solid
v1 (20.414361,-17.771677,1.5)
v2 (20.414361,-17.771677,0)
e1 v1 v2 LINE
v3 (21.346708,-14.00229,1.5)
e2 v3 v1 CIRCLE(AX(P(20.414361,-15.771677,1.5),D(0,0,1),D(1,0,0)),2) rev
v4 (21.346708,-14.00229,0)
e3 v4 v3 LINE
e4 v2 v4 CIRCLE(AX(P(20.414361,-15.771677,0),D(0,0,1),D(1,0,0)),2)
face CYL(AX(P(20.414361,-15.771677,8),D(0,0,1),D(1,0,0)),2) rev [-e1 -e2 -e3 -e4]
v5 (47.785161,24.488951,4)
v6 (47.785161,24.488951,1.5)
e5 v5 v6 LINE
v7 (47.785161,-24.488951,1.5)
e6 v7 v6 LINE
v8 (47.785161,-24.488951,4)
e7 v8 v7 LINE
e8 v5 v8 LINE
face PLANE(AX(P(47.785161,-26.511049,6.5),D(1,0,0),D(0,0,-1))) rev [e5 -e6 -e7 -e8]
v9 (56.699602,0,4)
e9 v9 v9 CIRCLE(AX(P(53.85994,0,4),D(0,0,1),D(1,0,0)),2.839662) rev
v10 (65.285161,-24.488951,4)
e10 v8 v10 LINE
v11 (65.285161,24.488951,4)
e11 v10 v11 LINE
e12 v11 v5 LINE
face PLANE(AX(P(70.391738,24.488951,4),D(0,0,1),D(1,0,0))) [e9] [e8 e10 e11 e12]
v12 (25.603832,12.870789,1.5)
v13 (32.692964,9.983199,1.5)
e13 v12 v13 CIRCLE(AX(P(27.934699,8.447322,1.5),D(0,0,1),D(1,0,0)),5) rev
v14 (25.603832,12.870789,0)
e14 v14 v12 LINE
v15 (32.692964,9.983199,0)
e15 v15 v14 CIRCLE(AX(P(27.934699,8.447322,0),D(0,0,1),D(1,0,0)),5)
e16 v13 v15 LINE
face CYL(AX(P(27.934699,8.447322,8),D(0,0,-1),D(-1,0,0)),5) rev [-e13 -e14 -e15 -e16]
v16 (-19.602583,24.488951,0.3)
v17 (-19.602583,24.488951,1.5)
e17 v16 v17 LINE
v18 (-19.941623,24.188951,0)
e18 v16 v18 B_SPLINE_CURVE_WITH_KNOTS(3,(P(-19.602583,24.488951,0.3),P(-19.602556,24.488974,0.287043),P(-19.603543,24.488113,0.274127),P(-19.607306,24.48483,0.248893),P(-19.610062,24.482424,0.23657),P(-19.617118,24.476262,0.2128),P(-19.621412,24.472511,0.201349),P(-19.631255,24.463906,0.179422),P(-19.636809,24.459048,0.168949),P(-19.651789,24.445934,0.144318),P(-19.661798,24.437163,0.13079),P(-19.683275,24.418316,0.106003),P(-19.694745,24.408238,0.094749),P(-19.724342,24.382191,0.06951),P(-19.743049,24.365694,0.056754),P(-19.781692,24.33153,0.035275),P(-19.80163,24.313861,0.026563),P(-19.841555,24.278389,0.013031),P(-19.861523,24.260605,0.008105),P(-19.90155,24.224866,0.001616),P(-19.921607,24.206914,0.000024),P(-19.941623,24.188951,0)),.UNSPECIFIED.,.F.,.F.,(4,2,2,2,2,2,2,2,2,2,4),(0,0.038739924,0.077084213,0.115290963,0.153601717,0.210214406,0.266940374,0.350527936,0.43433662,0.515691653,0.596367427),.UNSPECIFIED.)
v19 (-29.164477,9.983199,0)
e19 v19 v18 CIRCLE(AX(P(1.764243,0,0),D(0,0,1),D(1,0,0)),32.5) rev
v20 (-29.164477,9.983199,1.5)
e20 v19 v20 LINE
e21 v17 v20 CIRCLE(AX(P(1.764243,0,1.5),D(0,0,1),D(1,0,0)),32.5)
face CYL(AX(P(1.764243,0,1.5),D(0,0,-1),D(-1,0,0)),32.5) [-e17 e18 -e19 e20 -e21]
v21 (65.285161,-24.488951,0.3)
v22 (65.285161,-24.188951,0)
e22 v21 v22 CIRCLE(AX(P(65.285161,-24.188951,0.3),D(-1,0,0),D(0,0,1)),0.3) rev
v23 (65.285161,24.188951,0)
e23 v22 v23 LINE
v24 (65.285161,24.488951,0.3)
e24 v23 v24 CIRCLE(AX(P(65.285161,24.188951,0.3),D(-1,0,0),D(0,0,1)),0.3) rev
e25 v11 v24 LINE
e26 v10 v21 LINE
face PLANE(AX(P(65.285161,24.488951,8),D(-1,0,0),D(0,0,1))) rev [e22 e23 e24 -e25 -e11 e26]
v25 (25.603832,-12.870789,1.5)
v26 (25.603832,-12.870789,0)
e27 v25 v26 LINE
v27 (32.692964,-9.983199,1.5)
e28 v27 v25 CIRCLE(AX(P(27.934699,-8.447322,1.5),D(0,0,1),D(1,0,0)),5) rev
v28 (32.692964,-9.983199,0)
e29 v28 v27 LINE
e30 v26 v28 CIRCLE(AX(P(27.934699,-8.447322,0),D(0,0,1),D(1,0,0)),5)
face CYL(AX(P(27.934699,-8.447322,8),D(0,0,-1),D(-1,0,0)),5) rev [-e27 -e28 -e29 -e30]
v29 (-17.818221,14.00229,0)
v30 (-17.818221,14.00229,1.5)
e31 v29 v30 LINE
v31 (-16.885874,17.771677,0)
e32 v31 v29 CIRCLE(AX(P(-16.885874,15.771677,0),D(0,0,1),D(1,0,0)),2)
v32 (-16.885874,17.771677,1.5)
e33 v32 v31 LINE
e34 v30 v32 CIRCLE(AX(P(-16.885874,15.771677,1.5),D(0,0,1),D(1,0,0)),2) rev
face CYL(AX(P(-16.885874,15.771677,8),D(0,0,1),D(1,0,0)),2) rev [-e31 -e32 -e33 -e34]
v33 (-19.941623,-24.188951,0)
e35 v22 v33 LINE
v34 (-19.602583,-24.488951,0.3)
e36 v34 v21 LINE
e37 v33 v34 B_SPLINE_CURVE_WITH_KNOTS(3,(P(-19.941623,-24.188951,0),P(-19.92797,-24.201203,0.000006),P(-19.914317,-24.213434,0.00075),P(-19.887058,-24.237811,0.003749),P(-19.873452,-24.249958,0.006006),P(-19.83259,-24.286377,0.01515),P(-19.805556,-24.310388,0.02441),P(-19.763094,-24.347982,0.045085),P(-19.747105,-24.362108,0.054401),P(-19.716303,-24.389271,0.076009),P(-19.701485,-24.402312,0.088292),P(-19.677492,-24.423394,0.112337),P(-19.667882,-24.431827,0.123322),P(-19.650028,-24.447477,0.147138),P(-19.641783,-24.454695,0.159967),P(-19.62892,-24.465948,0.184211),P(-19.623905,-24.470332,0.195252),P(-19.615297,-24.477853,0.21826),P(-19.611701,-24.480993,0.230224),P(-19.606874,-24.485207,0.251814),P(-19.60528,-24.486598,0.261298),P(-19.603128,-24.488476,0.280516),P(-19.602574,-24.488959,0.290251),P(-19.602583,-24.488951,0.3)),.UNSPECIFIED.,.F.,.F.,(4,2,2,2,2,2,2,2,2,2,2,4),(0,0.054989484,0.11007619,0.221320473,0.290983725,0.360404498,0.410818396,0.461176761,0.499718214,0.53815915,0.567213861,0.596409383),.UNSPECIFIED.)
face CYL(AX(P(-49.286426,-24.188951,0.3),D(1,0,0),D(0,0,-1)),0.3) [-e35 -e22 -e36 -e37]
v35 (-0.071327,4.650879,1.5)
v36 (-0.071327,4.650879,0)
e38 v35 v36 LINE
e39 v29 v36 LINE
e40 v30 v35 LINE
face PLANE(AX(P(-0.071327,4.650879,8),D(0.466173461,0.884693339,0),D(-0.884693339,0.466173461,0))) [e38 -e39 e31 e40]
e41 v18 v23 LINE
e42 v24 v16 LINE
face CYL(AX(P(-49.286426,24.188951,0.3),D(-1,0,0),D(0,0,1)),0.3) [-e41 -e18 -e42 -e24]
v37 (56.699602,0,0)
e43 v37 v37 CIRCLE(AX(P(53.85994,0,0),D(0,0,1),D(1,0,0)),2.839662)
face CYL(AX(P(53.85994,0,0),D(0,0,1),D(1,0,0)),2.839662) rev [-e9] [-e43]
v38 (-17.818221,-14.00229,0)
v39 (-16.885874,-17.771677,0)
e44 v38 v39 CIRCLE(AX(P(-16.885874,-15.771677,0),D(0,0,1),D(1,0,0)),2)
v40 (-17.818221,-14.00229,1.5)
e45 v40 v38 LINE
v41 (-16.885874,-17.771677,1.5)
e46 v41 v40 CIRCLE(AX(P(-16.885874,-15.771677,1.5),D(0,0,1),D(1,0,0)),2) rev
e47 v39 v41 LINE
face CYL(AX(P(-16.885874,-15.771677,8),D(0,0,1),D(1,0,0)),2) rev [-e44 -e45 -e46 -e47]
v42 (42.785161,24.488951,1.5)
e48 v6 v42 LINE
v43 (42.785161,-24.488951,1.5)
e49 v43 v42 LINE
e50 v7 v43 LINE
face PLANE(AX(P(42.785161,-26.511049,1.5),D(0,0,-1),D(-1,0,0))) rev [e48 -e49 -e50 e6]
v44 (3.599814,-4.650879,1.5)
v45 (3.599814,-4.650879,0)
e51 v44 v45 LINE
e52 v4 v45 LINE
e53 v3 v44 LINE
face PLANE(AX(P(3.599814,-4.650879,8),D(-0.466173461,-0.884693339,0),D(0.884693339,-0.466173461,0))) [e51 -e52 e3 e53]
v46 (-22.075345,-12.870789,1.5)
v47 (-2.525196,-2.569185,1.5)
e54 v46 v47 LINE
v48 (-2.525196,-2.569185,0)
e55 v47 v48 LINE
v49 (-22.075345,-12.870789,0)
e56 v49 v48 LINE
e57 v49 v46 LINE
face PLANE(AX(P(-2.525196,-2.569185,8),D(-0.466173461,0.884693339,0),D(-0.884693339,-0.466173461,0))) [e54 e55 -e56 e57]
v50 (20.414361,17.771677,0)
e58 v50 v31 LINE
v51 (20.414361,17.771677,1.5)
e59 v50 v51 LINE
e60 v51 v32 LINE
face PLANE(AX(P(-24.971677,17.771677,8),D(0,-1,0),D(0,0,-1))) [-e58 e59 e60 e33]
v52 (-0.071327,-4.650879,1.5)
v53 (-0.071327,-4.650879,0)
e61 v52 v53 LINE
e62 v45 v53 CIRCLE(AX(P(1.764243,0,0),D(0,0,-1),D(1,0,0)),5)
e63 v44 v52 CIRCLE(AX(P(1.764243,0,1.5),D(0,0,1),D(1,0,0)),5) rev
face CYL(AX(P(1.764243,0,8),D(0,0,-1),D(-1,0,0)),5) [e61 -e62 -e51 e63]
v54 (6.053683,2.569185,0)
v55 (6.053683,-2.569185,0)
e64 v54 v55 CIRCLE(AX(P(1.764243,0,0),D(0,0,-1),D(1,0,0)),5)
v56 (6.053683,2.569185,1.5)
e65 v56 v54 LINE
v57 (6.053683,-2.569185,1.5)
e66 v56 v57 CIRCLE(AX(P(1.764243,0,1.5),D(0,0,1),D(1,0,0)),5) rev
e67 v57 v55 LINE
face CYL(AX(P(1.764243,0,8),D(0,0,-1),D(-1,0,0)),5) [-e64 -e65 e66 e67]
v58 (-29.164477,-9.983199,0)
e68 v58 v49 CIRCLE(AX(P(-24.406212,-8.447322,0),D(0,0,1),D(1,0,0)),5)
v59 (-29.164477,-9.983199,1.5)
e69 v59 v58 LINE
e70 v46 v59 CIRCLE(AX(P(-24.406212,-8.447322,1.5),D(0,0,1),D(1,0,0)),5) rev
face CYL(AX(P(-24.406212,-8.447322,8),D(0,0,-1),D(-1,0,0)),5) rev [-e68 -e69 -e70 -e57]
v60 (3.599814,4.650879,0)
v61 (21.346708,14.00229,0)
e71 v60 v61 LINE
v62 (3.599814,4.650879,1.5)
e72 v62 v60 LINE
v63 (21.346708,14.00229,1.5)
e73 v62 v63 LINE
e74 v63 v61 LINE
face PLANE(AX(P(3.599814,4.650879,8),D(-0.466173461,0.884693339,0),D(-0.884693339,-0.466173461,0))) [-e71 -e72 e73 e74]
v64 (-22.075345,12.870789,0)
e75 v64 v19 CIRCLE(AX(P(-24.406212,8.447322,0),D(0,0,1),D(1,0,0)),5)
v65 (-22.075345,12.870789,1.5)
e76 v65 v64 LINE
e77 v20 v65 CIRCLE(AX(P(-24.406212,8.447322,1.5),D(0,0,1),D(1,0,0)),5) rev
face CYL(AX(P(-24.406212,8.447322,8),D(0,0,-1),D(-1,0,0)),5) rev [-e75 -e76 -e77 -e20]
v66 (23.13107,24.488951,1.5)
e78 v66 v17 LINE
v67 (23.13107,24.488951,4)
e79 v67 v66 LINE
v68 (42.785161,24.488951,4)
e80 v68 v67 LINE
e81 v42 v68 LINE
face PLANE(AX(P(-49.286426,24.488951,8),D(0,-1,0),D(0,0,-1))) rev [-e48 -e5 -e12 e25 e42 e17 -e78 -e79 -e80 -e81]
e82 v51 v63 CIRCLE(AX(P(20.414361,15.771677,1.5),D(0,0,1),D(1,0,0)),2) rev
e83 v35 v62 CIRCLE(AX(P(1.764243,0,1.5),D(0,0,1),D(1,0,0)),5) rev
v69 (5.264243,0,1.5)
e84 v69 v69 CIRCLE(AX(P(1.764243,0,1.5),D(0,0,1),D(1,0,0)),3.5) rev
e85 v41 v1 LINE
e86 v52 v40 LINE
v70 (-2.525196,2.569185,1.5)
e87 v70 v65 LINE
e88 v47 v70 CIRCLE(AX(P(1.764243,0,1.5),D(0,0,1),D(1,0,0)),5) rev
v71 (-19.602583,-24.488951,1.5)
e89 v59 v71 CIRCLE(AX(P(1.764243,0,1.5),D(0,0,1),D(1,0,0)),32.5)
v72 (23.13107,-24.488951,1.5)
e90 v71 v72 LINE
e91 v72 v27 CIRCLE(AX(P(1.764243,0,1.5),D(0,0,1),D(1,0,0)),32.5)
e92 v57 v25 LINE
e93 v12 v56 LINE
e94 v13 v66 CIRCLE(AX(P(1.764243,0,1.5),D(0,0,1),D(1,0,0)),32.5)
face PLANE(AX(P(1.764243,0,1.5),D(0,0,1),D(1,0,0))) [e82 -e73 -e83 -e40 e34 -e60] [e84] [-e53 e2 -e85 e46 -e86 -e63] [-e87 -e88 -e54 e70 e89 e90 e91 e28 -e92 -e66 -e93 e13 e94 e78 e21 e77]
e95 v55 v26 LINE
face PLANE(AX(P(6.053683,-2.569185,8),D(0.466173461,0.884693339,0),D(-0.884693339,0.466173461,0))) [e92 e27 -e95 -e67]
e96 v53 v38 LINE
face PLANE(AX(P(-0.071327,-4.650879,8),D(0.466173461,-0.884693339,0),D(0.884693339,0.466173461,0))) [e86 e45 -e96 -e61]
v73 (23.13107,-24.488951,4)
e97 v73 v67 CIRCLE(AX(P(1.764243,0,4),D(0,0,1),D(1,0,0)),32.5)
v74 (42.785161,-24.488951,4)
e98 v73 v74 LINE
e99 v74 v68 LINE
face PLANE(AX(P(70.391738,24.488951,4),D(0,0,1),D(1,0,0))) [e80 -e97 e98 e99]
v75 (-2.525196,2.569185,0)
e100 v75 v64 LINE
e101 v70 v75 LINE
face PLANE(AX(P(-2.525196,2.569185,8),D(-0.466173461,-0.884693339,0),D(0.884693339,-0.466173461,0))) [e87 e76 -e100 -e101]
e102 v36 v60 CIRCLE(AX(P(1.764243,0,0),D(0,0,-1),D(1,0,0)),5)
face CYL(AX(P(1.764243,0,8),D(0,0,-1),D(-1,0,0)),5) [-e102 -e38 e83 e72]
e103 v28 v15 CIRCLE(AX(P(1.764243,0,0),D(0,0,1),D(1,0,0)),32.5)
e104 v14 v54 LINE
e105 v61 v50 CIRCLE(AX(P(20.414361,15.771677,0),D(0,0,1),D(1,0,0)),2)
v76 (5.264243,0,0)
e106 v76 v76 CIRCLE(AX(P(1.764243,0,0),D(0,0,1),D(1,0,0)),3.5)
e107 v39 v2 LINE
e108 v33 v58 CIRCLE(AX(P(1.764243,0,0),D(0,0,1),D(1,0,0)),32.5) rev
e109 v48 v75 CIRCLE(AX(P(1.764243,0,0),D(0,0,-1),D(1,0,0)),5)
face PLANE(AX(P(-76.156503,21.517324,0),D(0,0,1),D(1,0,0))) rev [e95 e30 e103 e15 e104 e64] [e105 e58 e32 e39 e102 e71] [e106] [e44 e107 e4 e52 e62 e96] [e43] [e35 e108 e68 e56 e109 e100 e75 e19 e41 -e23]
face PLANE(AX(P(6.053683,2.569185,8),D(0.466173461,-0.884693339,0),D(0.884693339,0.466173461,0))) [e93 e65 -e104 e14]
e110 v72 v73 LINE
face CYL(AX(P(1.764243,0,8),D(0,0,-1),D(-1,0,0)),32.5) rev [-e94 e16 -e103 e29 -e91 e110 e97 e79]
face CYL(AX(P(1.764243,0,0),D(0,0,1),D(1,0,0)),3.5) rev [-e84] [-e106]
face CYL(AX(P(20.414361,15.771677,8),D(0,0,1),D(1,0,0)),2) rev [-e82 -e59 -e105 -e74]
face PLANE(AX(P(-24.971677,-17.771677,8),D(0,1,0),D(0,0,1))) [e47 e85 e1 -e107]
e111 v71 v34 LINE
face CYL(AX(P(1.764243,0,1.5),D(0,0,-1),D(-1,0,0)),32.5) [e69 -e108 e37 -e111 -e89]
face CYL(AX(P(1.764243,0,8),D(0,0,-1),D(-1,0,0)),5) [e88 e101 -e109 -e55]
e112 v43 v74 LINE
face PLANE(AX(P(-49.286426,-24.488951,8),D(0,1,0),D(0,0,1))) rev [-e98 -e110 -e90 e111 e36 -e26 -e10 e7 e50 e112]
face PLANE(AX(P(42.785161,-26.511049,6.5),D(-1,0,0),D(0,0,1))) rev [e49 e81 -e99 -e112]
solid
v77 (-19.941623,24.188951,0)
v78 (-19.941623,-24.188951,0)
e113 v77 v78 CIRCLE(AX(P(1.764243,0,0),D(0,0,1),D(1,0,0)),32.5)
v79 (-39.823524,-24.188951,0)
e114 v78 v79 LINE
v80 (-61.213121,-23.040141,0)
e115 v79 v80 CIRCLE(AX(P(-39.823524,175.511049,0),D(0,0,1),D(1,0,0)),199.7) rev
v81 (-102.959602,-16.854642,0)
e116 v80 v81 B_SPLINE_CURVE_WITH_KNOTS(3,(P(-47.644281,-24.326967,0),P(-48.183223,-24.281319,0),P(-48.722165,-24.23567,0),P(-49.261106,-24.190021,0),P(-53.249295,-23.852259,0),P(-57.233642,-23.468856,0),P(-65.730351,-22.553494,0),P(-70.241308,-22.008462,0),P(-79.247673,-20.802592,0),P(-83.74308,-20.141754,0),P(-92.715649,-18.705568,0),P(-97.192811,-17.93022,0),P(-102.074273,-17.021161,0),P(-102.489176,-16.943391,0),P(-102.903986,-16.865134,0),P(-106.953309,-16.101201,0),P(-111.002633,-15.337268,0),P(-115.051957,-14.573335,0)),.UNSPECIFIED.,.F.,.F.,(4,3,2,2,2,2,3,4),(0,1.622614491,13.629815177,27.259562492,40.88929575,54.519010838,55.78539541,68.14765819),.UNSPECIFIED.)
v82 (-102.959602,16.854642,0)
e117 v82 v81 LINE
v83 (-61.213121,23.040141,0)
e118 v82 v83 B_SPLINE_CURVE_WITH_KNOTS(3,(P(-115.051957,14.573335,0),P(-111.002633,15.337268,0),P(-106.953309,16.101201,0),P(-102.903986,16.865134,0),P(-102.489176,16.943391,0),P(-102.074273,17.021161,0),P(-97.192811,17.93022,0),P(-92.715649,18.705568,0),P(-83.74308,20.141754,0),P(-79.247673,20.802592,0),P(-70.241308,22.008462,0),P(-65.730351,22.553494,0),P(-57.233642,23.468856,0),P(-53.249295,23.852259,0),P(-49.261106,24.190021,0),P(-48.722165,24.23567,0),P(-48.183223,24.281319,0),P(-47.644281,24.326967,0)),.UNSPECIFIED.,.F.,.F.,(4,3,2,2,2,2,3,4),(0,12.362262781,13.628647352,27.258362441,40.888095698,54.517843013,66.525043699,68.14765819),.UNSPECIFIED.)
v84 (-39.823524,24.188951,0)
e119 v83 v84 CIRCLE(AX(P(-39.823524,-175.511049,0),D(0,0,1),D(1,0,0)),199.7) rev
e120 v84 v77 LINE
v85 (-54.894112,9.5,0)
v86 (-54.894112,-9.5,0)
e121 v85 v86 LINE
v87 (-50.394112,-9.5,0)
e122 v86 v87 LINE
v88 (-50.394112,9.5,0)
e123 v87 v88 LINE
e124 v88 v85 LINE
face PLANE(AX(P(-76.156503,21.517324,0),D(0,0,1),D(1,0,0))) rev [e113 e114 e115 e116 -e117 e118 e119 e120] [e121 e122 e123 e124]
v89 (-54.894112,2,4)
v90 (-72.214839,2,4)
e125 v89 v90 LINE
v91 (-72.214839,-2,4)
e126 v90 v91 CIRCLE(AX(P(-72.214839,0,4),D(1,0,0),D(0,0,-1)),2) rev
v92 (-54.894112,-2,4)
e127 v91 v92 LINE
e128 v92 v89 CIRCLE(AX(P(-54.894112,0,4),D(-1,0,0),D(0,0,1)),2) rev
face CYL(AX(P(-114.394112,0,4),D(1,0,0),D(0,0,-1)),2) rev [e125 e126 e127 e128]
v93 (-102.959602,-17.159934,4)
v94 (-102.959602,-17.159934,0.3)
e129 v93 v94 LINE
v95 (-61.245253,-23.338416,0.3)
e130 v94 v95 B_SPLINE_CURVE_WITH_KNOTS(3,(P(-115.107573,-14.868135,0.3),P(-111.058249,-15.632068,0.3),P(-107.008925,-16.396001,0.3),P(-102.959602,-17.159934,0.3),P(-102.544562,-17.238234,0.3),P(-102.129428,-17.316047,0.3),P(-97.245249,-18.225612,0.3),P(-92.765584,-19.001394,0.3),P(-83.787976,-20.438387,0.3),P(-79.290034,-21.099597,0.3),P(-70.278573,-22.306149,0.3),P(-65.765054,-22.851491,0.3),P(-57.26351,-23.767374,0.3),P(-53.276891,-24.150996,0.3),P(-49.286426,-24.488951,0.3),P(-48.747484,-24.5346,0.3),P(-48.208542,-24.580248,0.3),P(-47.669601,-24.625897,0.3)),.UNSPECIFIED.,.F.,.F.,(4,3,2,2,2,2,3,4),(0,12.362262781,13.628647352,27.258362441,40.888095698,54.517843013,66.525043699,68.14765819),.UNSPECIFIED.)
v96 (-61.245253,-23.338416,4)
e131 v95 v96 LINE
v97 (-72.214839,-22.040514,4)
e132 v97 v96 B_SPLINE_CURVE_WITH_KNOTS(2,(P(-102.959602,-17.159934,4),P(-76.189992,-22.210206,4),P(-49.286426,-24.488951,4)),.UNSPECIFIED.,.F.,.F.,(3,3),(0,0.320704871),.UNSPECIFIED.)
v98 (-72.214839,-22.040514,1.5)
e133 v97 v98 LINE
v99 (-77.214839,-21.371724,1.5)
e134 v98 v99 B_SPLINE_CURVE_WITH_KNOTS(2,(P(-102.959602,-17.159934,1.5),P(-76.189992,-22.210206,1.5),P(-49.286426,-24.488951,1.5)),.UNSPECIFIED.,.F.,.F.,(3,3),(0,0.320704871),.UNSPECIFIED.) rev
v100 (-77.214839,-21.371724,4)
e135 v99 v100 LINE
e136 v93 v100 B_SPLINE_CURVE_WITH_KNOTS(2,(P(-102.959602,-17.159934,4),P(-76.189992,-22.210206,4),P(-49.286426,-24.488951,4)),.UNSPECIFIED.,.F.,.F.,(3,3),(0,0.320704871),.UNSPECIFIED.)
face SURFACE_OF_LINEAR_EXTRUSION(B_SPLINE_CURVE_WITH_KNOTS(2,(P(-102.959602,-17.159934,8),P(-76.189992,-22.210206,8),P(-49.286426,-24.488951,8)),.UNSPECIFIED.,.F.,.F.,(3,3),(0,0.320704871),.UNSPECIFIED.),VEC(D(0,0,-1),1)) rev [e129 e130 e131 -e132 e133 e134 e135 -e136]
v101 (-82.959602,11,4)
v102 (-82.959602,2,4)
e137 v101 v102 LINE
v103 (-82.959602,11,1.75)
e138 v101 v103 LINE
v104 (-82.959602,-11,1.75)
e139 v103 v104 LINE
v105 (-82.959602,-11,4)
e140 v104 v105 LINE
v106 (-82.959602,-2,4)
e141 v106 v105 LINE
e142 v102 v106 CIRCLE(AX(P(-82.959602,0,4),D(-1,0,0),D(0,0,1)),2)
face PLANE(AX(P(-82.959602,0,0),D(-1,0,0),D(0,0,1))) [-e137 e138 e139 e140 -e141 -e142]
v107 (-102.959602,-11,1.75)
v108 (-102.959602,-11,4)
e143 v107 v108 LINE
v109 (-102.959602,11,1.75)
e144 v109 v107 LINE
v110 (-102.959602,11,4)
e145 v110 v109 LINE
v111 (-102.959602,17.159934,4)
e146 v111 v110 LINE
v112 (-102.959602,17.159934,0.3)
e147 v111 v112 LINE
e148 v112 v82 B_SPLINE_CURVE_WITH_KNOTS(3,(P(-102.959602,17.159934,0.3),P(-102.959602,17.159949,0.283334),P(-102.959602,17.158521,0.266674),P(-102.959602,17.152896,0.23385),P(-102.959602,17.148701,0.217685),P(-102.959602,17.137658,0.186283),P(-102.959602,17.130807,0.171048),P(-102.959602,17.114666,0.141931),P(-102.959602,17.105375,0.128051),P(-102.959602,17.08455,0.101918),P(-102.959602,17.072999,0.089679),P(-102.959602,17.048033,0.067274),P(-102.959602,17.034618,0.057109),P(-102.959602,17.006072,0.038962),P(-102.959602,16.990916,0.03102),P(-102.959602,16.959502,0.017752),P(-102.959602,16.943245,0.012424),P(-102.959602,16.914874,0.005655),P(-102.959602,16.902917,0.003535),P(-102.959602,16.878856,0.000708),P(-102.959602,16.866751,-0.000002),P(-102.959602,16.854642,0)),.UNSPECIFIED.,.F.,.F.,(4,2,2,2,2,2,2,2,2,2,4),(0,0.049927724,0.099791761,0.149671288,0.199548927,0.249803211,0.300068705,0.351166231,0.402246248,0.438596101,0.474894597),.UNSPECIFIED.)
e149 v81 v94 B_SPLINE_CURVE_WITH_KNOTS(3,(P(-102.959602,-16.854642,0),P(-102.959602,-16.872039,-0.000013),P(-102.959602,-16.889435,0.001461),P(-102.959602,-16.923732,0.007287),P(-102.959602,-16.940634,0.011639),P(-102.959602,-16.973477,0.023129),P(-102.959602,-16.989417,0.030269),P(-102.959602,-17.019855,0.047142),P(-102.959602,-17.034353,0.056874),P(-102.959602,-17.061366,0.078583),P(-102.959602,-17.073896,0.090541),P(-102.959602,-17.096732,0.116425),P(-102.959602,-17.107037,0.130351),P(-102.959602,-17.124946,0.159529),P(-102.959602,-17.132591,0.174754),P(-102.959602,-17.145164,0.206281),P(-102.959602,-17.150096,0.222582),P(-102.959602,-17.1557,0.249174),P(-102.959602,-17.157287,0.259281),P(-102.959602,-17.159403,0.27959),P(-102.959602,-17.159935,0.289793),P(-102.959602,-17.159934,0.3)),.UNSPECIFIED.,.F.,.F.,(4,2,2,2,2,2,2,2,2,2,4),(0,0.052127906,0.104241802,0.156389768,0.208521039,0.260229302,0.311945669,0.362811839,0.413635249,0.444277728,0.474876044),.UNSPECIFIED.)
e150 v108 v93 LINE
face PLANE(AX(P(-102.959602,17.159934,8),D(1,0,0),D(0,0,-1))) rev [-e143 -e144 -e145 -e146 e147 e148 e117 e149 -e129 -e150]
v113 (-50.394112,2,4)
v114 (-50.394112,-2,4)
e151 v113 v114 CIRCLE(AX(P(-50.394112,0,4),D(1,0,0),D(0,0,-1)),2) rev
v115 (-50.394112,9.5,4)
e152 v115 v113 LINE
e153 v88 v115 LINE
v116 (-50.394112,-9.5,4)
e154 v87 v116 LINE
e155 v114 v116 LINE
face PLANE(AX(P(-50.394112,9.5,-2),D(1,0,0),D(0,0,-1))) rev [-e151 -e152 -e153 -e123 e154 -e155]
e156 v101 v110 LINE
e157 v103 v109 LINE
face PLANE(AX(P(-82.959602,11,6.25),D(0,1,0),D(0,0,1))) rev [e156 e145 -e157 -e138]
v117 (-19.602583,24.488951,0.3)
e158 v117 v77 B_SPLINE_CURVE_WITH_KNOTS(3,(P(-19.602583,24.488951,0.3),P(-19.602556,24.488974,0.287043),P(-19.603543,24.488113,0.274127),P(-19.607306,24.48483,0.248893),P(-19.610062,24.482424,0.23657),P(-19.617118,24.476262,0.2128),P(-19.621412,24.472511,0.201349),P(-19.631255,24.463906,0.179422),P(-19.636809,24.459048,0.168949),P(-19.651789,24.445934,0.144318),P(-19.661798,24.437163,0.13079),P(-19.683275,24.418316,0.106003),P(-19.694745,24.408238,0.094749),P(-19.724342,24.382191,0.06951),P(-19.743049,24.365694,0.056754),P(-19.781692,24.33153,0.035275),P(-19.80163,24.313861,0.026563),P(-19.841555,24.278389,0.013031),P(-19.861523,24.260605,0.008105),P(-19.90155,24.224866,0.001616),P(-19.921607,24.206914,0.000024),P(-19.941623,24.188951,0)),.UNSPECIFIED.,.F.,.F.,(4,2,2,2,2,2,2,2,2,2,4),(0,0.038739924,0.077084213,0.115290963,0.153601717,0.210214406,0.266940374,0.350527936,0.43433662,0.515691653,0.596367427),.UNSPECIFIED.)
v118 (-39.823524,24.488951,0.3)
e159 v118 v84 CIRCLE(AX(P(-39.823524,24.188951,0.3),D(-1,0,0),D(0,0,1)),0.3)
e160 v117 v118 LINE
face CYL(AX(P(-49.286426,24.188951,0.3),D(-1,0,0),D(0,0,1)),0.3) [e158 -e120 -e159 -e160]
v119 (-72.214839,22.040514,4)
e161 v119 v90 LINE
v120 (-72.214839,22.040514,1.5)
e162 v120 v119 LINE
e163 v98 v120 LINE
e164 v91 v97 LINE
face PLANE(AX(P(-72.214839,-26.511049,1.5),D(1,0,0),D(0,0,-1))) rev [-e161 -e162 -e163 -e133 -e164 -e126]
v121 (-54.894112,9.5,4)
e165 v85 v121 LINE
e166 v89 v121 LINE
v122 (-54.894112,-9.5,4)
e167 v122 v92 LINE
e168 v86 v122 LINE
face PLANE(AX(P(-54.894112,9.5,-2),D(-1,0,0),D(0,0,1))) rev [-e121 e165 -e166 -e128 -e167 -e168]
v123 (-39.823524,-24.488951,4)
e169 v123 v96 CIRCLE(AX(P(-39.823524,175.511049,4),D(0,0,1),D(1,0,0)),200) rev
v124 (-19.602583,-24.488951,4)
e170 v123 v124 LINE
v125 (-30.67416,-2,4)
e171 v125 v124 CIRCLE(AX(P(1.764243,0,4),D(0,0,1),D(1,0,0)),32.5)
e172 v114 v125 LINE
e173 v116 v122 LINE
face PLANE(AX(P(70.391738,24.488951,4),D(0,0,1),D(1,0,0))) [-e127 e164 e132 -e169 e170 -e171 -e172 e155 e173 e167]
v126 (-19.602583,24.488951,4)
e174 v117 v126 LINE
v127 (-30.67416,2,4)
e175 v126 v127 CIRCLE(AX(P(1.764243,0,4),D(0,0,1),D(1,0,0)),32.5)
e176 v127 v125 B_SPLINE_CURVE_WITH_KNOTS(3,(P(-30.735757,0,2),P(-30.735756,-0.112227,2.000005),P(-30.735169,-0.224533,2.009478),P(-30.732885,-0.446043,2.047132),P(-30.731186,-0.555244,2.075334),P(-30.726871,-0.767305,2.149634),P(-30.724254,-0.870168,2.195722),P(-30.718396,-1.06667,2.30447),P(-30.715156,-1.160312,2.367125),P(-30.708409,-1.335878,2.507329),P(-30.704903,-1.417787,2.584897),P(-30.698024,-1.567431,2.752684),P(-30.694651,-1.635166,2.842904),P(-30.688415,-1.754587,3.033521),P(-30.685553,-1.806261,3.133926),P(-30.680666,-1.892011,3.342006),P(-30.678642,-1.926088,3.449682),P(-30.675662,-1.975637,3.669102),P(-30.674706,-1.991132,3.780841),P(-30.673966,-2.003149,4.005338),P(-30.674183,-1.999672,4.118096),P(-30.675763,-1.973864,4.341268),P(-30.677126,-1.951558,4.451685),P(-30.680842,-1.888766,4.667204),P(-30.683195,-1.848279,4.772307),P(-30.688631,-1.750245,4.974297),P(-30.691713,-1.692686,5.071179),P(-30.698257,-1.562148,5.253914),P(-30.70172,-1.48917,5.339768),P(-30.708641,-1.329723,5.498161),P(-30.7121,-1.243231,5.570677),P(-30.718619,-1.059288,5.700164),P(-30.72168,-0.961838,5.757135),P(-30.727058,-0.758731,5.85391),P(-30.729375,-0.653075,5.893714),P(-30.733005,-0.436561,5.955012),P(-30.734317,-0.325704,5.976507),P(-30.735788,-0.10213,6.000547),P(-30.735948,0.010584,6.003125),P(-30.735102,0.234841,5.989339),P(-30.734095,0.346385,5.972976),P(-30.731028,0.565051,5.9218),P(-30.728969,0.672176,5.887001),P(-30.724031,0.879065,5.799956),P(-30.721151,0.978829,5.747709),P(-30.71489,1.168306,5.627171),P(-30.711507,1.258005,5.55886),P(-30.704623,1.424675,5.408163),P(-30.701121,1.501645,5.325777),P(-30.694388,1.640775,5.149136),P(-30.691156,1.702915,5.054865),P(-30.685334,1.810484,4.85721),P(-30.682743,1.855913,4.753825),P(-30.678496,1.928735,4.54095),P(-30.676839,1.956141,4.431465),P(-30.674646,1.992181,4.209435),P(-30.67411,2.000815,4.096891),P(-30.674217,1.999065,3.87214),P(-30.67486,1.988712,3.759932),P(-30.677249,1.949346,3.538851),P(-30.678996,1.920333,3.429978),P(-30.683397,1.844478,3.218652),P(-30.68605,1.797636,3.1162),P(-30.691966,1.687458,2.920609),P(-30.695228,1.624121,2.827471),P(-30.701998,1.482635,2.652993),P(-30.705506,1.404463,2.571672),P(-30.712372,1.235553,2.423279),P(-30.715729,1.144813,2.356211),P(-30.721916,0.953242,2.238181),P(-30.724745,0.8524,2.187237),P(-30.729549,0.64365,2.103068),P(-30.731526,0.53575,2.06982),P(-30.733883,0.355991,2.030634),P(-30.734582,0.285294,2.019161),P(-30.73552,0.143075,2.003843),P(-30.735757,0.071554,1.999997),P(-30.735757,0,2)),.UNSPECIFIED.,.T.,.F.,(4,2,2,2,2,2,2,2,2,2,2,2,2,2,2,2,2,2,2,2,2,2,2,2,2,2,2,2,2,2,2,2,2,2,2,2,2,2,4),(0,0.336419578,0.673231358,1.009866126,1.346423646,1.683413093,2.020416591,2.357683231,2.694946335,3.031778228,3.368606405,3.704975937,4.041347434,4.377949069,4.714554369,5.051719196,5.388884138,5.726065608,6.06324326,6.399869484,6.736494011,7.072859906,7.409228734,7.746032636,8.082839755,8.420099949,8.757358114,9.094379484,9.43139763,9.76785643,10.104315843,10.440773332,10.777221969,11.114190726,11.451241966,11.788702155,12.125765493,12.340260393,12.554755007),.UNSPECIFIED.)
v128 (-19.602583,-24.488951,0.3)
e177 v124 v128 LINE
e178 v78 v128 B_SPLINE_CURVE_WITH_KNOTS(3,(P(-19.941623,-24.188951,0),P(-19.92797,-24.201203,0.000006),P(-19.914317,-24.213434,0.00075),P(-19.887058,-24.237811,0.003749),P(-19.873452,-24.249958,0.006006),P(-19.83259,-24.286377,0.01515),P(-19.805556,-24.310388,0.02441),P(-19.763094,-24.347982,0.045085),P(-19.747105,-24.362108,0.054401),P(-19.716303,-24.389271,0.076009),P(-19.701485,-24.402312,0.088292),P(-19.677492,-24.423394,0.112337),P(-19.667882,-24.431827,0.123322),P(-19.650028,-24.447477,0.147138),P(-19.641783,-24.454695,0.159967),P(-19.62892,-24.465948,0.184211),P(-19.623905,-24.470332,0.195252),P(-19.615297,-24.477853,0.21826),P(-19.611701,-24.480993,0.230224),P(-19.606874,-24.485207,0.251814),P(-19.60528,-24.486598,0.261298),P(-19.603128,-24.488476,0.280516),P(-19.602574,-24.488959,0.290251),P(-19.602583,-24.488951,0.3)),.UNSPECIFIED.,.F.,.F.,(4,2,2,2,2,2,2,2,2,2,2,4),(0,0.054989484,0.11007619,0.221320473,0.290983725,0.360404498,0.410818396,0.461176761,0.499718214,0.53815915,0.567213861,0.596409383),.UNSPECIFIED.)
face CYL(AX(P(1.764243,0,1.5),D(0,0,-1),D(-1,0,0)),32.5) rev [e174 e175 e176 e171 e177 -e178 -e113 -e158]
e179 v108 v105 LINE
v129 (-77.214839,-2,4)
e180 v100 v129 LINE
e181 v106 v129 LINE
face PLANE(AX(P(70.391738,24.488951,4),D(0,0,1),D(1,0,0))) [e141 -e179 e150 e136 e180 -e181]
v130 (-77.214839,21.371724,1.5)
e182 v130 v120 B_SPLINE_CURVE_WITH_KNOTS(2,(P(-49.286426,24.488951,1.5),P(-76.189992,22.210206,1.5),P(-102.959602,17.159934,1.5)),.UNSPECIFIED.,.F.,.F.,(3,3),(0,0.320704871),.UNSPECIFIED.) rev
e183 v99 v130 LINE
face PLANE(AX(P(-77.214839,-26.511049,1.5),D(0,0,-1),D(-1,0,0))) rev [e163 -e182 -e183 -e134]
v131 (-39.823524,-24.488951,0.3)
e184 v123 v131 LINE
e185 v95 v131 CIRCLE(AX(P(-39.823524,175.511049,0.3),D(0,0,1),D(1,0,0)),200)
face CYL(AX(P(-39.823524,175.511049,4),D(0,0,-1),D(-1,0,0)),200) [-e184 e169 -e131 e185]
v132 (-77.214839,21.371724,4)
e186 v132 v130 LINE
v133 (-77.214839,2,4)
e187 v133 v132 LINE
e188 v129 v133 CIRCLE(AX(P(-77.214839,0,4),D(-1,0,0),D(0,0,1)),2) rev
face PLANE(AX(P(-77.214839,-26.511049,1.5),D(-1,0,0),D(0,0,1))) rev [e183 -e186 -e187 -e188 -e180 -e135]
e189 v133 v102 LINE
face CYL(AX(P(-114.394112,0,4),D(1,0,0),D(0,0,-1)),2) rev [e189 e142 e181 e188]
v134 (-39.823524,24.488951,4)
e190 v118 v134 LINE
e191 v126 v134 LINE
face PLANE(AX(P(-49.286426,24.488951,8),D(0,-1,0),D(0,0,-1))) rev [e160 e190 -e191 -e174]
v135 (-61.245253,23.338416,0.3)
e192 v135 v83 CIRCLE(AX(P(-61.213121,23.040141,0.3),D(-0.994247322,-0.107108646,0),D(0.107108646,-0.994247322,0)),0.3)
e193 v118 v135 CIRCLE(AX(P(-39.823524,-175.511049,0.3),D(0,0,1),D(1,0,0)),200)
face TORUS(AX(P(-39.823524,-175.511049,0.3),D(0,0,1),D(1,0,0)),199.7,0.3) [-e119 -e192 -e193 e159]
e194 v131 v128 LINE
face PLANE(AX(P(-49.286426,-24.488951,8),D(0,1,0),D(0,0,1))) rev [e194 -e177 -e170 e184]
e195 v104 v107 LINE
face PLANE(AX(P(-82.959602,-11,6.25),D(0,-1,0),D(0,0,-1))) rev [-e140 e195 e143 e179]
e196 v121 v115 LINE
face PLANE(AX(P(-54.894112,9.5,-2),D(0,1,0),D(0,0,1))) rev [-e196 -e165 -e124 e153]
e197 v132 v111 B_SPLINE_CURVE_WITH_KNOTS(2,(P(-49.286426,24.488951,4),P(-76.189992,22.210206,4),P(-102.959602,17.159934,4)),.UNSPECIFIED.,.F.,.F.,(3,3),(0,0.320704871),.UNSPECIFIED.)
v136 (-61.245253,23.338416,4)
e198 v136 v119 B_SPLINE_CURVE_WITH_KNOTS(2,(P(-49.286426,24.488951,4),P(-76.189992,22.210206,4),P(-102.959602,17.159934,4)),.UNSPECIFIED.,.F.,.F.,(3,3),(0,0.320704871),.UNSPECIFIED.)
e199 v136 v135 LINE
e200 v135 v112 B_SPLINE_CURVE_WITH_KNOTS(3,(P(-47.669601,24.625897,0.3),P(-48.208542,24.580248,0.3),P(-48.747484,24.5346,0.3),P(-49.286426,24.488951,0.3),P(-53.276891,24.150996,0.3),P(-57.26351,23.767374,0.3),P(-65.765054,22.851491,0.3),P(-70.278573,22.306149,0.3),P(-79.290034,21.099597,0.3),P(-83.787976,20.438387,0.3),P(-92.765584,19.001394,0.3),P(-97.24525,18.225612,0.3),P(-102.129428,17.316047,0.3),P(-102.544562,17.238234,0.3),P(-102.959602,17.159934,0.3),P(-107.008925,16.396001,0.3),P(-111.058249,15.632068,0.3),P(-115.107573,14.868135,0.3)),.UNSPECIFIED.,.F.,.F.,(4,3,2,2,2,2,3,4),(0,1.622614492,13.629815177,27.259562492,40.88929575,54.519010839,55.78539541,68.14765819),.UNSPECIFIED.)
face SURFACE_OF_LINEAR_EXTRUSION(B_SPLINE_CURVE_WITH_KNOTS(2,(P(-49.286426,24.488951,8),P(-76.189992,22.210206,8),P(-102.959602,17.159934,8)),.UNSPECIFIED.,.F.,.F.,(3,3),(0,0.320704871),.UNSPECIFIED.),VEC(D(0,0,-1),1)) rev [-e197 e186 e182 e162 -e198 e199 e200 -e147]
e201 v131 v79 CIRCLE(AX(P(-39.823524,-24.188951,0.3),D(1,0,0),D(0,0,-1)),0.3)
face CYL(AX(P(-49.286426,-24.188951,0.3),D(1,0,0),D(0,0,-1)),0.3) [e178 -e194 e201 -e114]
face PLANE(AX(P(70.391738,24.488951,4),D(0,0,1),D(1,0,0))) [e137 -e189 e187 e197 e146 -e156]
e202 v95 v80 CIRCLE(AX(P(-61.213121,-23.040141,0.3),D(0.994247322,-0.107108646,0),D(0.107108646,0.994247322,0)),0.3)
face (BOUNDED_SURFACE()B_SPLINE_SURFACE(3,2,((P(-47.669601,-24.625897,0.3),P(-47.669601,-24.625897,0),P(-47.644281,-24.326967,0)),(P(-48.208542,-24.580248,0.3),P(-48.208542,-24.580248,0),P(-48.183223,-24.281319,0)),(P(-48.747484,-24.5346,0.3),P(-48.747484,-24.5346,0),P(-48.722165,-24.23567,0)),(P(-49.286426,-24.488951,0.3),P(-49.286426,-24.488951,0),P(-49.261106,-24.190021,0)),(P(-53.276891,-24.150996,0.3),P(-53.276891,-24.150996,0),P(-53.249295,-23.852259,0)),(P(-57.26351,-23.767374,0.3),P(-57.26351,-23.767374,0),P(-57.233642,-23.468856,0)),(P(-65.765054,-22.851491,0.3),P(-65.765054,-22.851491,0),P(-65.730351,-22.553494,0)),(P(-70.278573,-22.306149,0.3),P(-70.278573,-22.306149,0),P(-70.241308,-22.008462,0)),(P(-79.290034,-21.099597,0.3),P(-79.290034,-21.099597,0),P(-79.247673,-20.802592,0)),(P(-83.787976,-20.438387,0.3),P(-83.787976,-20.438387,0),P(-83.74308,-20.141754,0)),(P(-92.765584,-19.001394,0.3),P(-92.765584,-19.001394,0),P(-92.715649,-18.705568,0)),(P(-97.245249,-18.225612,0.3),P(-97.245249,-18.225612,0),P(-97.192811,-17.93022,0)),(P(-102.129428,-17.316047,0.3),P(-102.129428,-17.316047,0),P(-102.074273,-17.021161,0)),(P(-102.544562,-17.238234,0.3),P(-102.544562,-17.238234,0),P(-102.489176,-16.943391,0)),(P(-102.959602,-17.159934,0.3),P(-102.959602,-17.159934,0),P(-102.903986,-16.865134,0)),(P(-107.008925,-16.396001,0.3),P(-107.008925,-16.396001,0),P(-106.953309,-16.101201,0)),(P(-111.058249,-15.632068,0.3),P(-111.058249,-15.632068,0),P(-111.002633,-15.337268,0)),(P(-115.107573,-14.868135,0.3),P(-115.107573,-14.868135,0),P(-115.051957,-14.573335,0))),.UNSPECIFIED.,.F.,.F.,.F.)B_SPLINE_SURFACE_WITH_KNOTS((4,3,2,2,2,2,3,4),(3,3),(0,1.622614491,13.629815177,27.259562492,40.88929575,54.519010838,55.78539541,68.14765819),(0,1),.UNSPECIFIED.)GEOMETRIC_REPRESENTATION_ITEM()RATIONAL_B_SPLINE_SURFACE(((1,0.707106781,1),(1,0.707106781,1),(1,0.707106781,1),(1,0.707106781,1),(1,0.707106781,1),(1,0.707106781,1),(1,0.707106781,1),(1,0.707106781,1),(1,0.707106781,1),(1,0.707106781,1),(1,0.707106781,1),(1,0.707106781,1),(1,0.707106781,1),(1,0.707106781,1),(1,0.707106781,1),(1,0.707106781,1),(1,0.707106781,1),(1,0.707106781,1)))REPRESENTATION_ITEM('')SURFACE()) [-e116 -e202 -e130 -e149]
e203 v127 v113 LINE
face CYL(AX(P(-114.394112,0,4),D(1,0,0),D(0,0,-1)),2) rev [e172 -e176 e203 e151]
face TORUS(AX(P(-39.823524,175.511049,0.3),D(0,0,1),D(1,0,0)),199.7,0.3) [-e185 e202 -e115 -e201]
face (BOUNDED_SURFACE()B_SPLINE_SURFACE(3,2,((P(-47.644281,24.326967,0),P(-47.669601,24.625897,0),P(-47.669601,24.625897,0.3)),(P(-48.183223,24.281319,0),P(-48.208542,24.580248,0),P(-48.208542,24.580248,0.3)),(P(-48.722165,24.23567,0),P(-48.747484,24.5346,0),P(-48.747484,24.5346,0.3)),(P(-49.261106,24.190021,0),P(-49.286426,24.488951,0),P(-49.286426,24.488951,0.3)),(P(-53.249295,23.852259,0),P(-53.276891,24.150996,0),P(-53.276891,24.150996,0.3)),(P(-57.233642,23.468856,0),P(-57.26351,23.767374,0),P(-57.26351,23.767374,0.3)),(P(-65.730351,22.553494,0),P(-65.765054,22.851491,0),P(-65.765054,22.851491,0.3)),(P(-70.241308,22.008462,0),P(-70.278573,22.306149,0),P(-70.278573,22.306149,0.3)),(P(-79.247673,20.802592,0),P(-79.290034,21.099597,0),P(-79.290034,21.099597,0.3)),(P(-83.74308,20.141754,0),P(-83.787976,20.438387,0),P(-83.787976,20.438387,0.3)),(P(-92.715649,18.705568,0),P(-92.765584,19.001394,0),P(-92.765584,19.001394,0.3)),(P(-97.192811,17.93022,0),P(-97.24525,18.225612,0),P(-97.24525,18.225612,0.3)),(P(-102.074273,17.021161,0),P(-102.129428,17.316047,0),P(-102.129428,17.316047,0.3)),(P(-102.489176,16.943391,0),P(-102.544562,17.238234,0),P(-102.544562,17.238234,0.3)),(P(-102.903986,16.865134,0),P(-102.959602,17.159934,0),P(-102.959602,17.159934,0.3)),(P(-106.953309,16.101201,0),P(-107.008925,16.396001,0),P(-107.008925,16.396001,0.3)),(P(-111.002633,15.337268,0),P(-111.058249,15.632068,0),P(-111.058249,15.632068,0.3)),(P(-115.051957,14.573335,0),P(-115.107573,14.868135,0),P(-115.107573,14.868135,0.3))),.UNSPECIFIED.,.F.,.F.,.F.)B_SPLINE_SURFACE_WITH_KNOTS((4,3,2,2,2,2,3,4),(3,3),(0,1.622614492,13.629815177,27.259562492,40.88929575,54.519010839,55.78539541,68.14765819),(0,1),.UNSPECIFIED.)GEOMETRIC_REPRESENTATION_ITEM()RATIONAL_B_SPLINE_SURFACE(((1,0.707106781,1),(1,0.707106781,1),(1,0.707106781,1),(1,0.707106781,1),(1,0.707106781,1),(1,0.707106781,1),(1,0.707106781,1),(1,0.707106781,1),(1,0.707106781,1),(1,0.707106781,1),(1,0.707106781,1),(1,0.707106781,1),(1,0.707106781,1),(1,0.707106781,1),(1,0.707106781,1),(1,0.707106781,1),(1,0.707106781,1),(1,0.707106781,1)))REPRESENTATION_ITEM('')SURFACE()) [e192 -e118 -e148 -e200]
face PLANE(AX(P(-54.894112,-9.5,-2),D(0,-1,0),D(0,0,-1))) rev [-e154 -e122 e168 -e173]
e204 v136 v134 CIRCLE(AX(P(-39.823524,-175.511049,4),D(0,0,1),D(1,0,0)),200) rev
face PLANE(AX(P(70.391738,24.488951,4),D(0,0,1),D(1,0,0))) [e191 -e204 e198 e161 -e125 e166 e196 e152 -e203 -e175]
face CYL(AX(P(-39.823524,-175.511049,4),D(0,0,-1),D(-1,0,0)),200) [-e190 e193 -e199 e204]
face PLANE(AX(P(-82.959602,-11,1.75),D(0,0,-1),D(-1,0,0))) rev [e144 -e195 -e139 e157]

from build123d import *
from build123d.topology import SkipClean

# Parameters (mm, degrees)
BOSS_EXTRUDE1_DEPTH      = 8
FILLET2_R                = 2
SKETCH3_R                = 2.839661977
CUT_EXTRUDE1_DEPTH       = 8
SKETCH4_R                = 3.5
CUT_EXTRUDE2_DEPTH       = 8
CUT_EXTRUDE3_DEPTH       = 2.5
CUT_EXTRUDE3_DEPTH_BACK  = 2.5
SKETCH5_R                = 32.5
SKETCH6_W                = 4.5
SKETCH6_H                = 19
CUT_EXTRUDE4_DEPTH       = 10
SKETCH7_W                = 5
SKETCH7_H                = 5
CUT_EXTRUDE5_DEPTH       = 51
FILLET3_START            = -1
FILLET3_DEPTH            = 10
FILLET4_START            = -1
FILLET4_DEPTH            = 10
SKETCH9_W                = 5
SKETCH9_H                = 5
CUT_EXTRUDE6_DEPTH       = 51
CUT_EXTRUDE7_DEPTH       = 64
CUT_EXTRUDE7_DEPTH_BACK  = 25
SKETCH10_R               = 2
FILLET5_DEPTH            = 1.5
FILLET5_START            = 6.5
FILLET5_2_DEPTH          = 1.5
CUT_EXTRUDE8_START       = -4
CUT_EXTRUDE8_DEPTH       = 4
FILLET6_R                = 0.3
SKETCH13_W               = 4.5
SKETCH13_H               = 22
CUT_EXTRUDE9_DEPTH       = 20
SURFACE_EXTRUDE2_1_BACK  = 5
SURFACE_EXTRUDE2_1_DEPTH = 5
SURFACE_EXTRUDE2_2_BACK  = 5
SURFACE_EXTRUDE2_2_DEPTH = 5


with BuildPart() as part:
    # Sketch2 → Boss-Extrude1 (new body)
    with BuildSketch(Plane.XY):
        with BuildLine():
            Line((-102.95960155, 17.159933592), (-102.95960155, -17.159933592))
            add(Edge.make_bspline(
                [(-102.95960155, -17.159933592), (-76.189992309, -22.210205625), (-49.286425804, -24.488951052)],
                knots=[0, 0, 0, 0.320704871, 0.320704871, 0.320704871], degree=2))
            Line((-49.286425804, -24.488951052), (65.285160882, -24.488951052))
            Line((65.285160882, -24.488951052), (65.285160882, 24.488951052))
            Line((65.285160882, 24.488951052), (-49.286425804, 24.488951052))
            add(Edge.make_bspline(
                [(-102.95960155, 17.159933592), (-76.189992309, 22.210205625), (-49.286425804, 24.488951052)],
                knots=[0, 0, 0, 0.320704871, 0.320704871, 0.320704871], degree=2))
        make_face()
        with BuildLine():
            Line((-24.971677166, 17.771677006), (28.500163837, 17.771677006))
            Line((28.500163837, 17.771677006), (3.599814154, 4.650879462))
            ThreePointArc((3.599814154, 4.650879462), (1.764243335, 5), (-0.071327484, 4.650879462))
            Line((-0.071327484, 4.650879462), (-24.971677166, 17.771677006))
        make_face(mode=Mode.SUBTRACT)
        with BuildLine():
            Line((3.599814154, -4.650879462), (28.500163837, -17.771677006))
            Line((28.500163837, -17.771677006), (-24.971677166, -17.771677006))
            Line((-24.971677166, -17.771677006), (-0.071327484, -4.650879462))
            ThreePointArc((-0.071327484, -4.650879462), (1.764243335, -5), (3.599814154, -4.650879462))
        make_face(mode=Mode.SUBTRACT)
        with BuildLine():
            Line((-2.525196045, 2.569184657), (-26.859859934, 15.391904107))
            ThreePointArc((-26.859859934, 15.391904107), (-30.735756665, 0), (-26.859859934, -15.391904107))
            Line((-26.859859934, -15.391904107), (-2.525196045, -2.569184657))
            ThreePointArc((-2.525196045, -2.569184657), (-3.235756665, 0), (-2.525196045, 2.569184657))
        make_face(mode=Mode.SUBTRACT)
        with BuildLine():
            Line((6.053682716, -2.569184657), (30.388346604, -15.391904107))
            ThreePointArc((30.388346604, -15.391904107), (34.264243335, 0), (30.388346604, 15.391904107))
            Line((30.388346604, 15.391904107), (6.053682716, 2.569184657))
            ThreePointArc((6.053682716, 2.569184657), (6.764243335, 0), (6.053682716, -2.569184657))
        make_face(mode=Mode.SUBTRACT)
    extrude(amount=BOSS_EXTRUDE1_DEPTH)

    # Fillet2
    fillet2_edges = [part.edges().sort_by_distance(p)[0] for p in [
        (-24.971677166, 17.771677006, 4),
        (28.500163837, 17.771677006, 4),
        (-24.971677166, -17.771677006, 4),
        (28.500163837, -17.771677006, 4),
    ]]
    fillet(fillet2_edges, radius=FILLET2_R)

    # Sketch3 → Cut-Extrude1 (cut)
    with BuildSketch(Plane.XY.offset(8)):
        with Locations((53.859940094, 0)):
            Circle(SKETCH3_R)
    extrude(amount=-CUT_EXTRUDE1_DEPTH, mode=Mode.SUBTRACT)

    # Sketch4 → Cut-Extrude2 (cut)
    with BuildSketch(Plane.XY.offset(8)):
        with Locations((1.764243335, 0)):
            Circle(SKETCH4_R)
    extrude(amount=-CUT_EXTRUDE2_DEPTH, mode=Mode.SUBTRACT)

    # Sketch5 → Cut-Extrude3 (cut, two sides: drawn at the far end of the back side and taken through both)
    with SkipClean():  # the faces are left unmerged after this step: merging them gives an invalid solid
        with BuildSketch(Plane.XY.offset(4).offset(-CUT_EXTRUDE3_DEPTH_BACK)):
            with Locations((1.764243335, 0)):
                Circle(SKETCH5_R)
        extrude(amount=CUT_EXTRUDE3_DEPTH + CUT_EXTRUDE3_DEPTH_BACK, mode=Mode.SUBTRACT)

    # Sketch6 → Cut-Extrude4 (cut)
    with SkipClean():  # the faces are left unmerged after this step: merging them gives an invalid solid
        with BuildSketch(Plane.XY.offset(8)):
            with Locations((-52.644112073, 0)):
                Rectangle(SKETCH6_W, SKETCH6_H)
        extrude(amount=-CUT_EXTRUDE4_DEPTH, mode=Mode.SUBTRACT)

    # Sketch7 → Cut-Extrude5 (cut)
    with SkipClean():  # the faces are left unmerged after this step: merging them gives an invalid solid
        with BuildSketch(Plane(origin=(0, 24.488951052, 0), x_dir=(1, 0, 0), z_dir=(0, 1, 0))):
            with Locations((45.285160882, -4)):
                Rectangle(SKETCH7_W, SKETCH7_H)
        extrude(amount=-CUT_EXTRUDE5_DEPTH, mode=Mode.SUBTRACT)

    # Fillet3: read off the stored shape, not the designer's step
    # Fillet3 outline → Fillet3 (cut)
    with SkipClean():  # the faces are left unmerged after this step: merging them gives an invalid solid
        with BuildSketch(Plane.XY.offset(FILLET3_START)):
            with BuildLine():
                add(Edge.make_bspline(
                    [(-49.286425804, 24.488951052), (-55.269151656, 23.982211205), (-61.245253134, 23.338415518)],
                    knots=[0, 0, 0, 0.071317285, 0.071317285, 0.071317285], degree=2))
                ThreePointArc((-61.245253134, 23.338415518), (-50.549825889, 24.201110037), (-39.823523948, 24.488951052))
                Line((-39.823523948, 24.488951052), (-49.286425804, 24.488951052))
            make_face()
        extrude(amount=FILLET3_DEPTH, mode=Mode.SUBTRACT)

    # Fillet4: read off the stored shape, not the designer's step
    # Fillet4 outline → Fillet4 (cut)
    with SkipClean():  # the faces are left unmerged after this step: merging them gives an invalid solid
        with BuildSketch(Plane.XY.offset(FILLET4_START)):
            with BuildLine():
                Line((-49.286425804, -24.488951052), (-39.823523948, -24.488951052))
                ThreePointArc((-39.823523948, -24.488951052), (-50.549825889, -24.201110037), (-61.245253134, -23.338415518))
                add(Edge.make_bspline(
                    [(-61.245253134, -23.338415518), (-55.269151656, -23.982211205), (-49.286425804, -24.488951052)],
                    knots=[0.249387586, 0.249387586, 0.249387586, 0.320704871, 0.320704871, 0.320704871], degree=2))
            make_face()
        extrude(amount=FILLET4_DEPTH, mode=Mode.SUBTRACT)

    # Sketch9 → Cut-Extrude6 (cut)
    with SkipClean():  # the faces are left unmerged after this step: merging them gives an invalid solid
        with BuildSketch(Plane(origin=(0, 24.488951052, 0), x_dir=(1, 0, 0), z_dir=(0, 1, 0))):
            with Locations((-74.714839118, -4)):
                Rectangle(SKETCH9_W, SKETCH9_H)
        extrude(amount=-CUT_EXTRUDE6_DEPTH, mode=Mode.SUBTRACT)

    # Sketch10 → Cut-Extrude7 (cut, two sides: drawn at the far end of the back side and taken through both)
    with SkipClean():  # the faces are left unmerged after this step: merging them gives an invalid solid
        with BuildSketch(Plane.ZY.offset(50.394112073).offset(-CUT_EXTRUDE7_DEPTH_BACK)):
            with Locations(Location((4, 0, 0), (0, 0, 180))):
                Circle(SKETCH10_R)
        extrude(amount=CUT_EXTRUDE7_DEPTH + CUT_EXTRUDE7_DEPTH_BACK, mode=Mode.SUBTRACT)

    # Fillet5: read off the stored shape, not the designer's step
    # Fillet5 outline → Fillet5 (add)
    with SkipClean():  # the faces are left unmerged after this step: merging them gives an invalid solid
        with BuildSketch(Plane.XY):
            with BuildLine():
                Line((30.388346604, 15.391904107), (25.603831674, 12.87078884))
                ThreePointArc((25.603831674, 12.87078884), (29.820861326, 13.077915151), (32.692963641, 9.983198898))
                ThreePointArc((32.692963641, 9.983198898), (31.663210239, 12.739771507), (30.388346604, 15.391904107))
            make_face()
            with BuildLine():
                ThreePointArc((30.388346604, -15.391904107), (31.663210239, -12.739771507), (32.692963641, -9.983198898))
                ThreePointArc((32.692963641, -9.983198898), (29.820861326, -13.077915151), (25.603831674, -12.87078884))
                Line((25.603831674, -12.87078884), (30.388346604, -15.391904107))
            make_face()
            with BuildLine():
                Line((-26.859859934, -15.391904107), (-22.075345003, -12.87078884))
                ThreePointArc((-22.075345003, -12.87078884), (-26.292374655, -13.077915151), (-29.164476971, -9.983198898))
                ThreePointArc((-29.164476971, -9.983198898), (-28.134723569, -12.739771507), (-26.859859934, -15.391904107))
            make_face()
            with BuildLine():
                ThreePointArc((-26.859859934, 15.391904107), (-28.134723569, 12.739771507), (-29.164476971, 9.983198898))
                ThreePointArc((-29.164476971, 9.983198898), (-26.292374655, 13.077915151), (-22.075345003, 12.87078884))
                Line((-22.075345003, 12.87078884), (-26.859859934, 15.391904107))
            make_face()
        extrude(amount=FILLET5_DEPTH)

    # Fillet5 2 outline → Fillet5 2 (add)
    with SkipClean():  # the faces are left unmerged after this step: merging them gives an invalid solid
        with BuildSketch(Plane.XY.offset(FILLET5_START)):
            with BuildLine():
                Line((30.388346604, 15.391904107), (25.603831674, 12.87078884))
                ThreePointArc((25.603831674, 12.87078884), (29.820861326, 13.077915151), (32.692963641, 9.983198898))
                ThreePointArc((32.692963641, 9.983198898), (31.663210239, 12.739771507), (30.388346604, 15.391904107))
            make_face()
            with BuildLine():
                ThreePointArc((30.388346604, -15.391904107), (31.663210239, -12.739771507), (32.692963641, -9.983198898))
                ThreePointArc((32.692963641, -9.983198898), (29.820861326, -13.077915151), (25.603831674, -12.87078884))
                Line((25.603831674, -12.87078884), (30.388346604, -15.391904107))
            make_face()
            with BuildLine():
                Line((-26.859859934, -15.391904107), (-22.075345003, -12.87078884))
                ThreePointArc((-22.075345003, -12.87078884), (-26.292374655, -13.077915151), (-29.164476971, -9.983198898))
                ThreePointArc((-29.164476971, -9.983198898), (-28.134723569, -12.739771507), (-26.859859934, -15.391904107))
            make_face()
            with BuildLine():
                ThreePointArc((-26.859859934, 15.391904107), (-28.134723569, 12.739771507), (-29.164476971, 9.983198898))
                ThreePointArc((-29.164476971, 9.983198898), (-26.292374655, 13.077915151), (-22.075345003, 12.87078884))
                Line((-22.075345003, 12.87078884), (-26.859859934, 15.391904107))
            make_face()
        extrude(amount=FILLET5_2_DEPTH)


with BuildPart() as body_2:
    # Split1: read off the stored shape, not the designer's step
    # Split1: the piece on the far side of the plane
    add(part.part)
    split(bisect_by=Plane.XY.offset(4), keep=Keep.BOTTOM)

    # Fillet6
    fillet6_edges = [body_2.edges().sort_by_distance(p)[0] for p in [
        (-82.163571081, 20.662100298, 0),
        (-82.163571081, -20.662100298, 0),
        (12.730818467, -24.488951052, 0),
        (12.730818467, 24.488951052, 0),
        (-50.549825889, 24.201110037, 0),
        (-50.549825889, -24.201110037, 0),
    ]]
    fillet(fillet6_edges, radius=FILLET6_R)

    # Sketch13 → Cut-Extrude9 (cut)
    with SkipClean():  # the faces are left unmerged after this step: merging them gives an invalid solid
        with BuildSketch(Plane.ZY.offset(102.95960155)):
            with Locations((4, 0)):
                Rectangle(SKETCH13_W, SKETCH13_H)
        extrude(amount=-CUT_EXTRUDE9_DEPTH, mode=Mode.SUBTRACT)


with BuildPart() as part_1:
    add(part.part)

    # Split1
    split(bisect_by=Plane.XY.offset(4), keep=Keep.TOP)

    # Sketch12 → Cut-Extrude8 (cut)
    with BuildSketch(Plane.XY.offset(8).offset(CUT_EXTRUDE8_START)):
        with BuildLine():
            Line((-39.823523948, -24.488951052), (65.285160882, -24.488951052))
            Line((65.285160882, -24.488951052), (65.285160882, 24.488951052))
            Line((65.285160882, 24.488951052), (-39.823523948, 24.488951052))
            ThreePointArc((-39.823523948, 24.488951052), (-50.549825889, 24.201110037), (-61.245253134, 23.338415518))
            add(Edge.make_bspline(
                [(-61.245253134, 23.338415518), (-82.142929204, 21.087142885), (-102.959601581, 17.159933586)],
                knots=[0, 0, 0, 1, 1, 1], degree=2))
            Line((-102.959601581, 17.159933586), (-102.959601388, -17.159933622))
            add(Edge.make_bspline(
                [(-102.959601388, -17.159933622), (-82.142929109, -21.087142896), (-61.245253139, -23.338415518)],
                knots=[0, 0, 0, 1, 1, 1], degree=2))
            ThreePointArc((-61.245253139, -23.338415518), (-50.549825891, -24.201110037), (-39.823523948, -24.488951052))
        make_face()
    extrude(amount=CUT_EXTRUDE8_DEPTH, mode=Mode.SUBTRACT)


with BuildPart() as body_2_2:
    # Split2: the piece behind the surface
    add(body_2.part)
    # Surface-Extrude2: a surface, the sketch's curves swept straight by 5 mm
    with BuildLine(Plane.XY.offset(1.5).offset(-SURFACE_EXTRUDE2_1_BACK), mode=Mode.PRIVATE) as surface_extrude2_1_path:
        ThreePointArc((-18.386509966, 25.498963535), (-30.729424728, -0.641510544), (-17.364366662, -26.274441565))
    surface_extrude2_1 = Shell.extrude(surface_extrude2_1_path.wire(), (0 * SURFACE_EXTRUDE2_1_DEPTH, 0 * SURFACE_EXTRUDE2_1_DEPTH, 1 * SURFACE_EXTRUDE2_1_DEPTH))
    split(bisect_by=surface_extrude2_1, keep=Keep.BOTTOM)


with BuildPart() as body_2_1:
    add(body_2.part)

    # Split2: split by a surface, the side it looks to stays
    # Surface-Extrude2: a surface, the sketch's curves swept straight by 5 mm
    with BuildLine(Plane.XY.offset(1.5).offset(-SURFACE_EXTRUDE2_2_BACK), mode=Mode.PRIVATE) as surface_extrude2_2_path:
        ThreePointArc((-18.386509966, 25.498963535), (-30.729424728, -0.641510544), (-17.364366662, -26.274441565))
    surface_extrude2_2 = Shell.extrude(surface_extrude2_2_path.wire(), (0 * SURFACE_EXTRUDE2_2_DEPTH, 0 * SURFACE_EXTRUDE2_2_DEPTH, 1 * SURFACE_EXTRUDE2_2_DEPTH))
    split(bisect_by=surface_extrude2_2, keep=Keep.TOP)


solid = Compound([body_2_2.part, body_2_1.part])
